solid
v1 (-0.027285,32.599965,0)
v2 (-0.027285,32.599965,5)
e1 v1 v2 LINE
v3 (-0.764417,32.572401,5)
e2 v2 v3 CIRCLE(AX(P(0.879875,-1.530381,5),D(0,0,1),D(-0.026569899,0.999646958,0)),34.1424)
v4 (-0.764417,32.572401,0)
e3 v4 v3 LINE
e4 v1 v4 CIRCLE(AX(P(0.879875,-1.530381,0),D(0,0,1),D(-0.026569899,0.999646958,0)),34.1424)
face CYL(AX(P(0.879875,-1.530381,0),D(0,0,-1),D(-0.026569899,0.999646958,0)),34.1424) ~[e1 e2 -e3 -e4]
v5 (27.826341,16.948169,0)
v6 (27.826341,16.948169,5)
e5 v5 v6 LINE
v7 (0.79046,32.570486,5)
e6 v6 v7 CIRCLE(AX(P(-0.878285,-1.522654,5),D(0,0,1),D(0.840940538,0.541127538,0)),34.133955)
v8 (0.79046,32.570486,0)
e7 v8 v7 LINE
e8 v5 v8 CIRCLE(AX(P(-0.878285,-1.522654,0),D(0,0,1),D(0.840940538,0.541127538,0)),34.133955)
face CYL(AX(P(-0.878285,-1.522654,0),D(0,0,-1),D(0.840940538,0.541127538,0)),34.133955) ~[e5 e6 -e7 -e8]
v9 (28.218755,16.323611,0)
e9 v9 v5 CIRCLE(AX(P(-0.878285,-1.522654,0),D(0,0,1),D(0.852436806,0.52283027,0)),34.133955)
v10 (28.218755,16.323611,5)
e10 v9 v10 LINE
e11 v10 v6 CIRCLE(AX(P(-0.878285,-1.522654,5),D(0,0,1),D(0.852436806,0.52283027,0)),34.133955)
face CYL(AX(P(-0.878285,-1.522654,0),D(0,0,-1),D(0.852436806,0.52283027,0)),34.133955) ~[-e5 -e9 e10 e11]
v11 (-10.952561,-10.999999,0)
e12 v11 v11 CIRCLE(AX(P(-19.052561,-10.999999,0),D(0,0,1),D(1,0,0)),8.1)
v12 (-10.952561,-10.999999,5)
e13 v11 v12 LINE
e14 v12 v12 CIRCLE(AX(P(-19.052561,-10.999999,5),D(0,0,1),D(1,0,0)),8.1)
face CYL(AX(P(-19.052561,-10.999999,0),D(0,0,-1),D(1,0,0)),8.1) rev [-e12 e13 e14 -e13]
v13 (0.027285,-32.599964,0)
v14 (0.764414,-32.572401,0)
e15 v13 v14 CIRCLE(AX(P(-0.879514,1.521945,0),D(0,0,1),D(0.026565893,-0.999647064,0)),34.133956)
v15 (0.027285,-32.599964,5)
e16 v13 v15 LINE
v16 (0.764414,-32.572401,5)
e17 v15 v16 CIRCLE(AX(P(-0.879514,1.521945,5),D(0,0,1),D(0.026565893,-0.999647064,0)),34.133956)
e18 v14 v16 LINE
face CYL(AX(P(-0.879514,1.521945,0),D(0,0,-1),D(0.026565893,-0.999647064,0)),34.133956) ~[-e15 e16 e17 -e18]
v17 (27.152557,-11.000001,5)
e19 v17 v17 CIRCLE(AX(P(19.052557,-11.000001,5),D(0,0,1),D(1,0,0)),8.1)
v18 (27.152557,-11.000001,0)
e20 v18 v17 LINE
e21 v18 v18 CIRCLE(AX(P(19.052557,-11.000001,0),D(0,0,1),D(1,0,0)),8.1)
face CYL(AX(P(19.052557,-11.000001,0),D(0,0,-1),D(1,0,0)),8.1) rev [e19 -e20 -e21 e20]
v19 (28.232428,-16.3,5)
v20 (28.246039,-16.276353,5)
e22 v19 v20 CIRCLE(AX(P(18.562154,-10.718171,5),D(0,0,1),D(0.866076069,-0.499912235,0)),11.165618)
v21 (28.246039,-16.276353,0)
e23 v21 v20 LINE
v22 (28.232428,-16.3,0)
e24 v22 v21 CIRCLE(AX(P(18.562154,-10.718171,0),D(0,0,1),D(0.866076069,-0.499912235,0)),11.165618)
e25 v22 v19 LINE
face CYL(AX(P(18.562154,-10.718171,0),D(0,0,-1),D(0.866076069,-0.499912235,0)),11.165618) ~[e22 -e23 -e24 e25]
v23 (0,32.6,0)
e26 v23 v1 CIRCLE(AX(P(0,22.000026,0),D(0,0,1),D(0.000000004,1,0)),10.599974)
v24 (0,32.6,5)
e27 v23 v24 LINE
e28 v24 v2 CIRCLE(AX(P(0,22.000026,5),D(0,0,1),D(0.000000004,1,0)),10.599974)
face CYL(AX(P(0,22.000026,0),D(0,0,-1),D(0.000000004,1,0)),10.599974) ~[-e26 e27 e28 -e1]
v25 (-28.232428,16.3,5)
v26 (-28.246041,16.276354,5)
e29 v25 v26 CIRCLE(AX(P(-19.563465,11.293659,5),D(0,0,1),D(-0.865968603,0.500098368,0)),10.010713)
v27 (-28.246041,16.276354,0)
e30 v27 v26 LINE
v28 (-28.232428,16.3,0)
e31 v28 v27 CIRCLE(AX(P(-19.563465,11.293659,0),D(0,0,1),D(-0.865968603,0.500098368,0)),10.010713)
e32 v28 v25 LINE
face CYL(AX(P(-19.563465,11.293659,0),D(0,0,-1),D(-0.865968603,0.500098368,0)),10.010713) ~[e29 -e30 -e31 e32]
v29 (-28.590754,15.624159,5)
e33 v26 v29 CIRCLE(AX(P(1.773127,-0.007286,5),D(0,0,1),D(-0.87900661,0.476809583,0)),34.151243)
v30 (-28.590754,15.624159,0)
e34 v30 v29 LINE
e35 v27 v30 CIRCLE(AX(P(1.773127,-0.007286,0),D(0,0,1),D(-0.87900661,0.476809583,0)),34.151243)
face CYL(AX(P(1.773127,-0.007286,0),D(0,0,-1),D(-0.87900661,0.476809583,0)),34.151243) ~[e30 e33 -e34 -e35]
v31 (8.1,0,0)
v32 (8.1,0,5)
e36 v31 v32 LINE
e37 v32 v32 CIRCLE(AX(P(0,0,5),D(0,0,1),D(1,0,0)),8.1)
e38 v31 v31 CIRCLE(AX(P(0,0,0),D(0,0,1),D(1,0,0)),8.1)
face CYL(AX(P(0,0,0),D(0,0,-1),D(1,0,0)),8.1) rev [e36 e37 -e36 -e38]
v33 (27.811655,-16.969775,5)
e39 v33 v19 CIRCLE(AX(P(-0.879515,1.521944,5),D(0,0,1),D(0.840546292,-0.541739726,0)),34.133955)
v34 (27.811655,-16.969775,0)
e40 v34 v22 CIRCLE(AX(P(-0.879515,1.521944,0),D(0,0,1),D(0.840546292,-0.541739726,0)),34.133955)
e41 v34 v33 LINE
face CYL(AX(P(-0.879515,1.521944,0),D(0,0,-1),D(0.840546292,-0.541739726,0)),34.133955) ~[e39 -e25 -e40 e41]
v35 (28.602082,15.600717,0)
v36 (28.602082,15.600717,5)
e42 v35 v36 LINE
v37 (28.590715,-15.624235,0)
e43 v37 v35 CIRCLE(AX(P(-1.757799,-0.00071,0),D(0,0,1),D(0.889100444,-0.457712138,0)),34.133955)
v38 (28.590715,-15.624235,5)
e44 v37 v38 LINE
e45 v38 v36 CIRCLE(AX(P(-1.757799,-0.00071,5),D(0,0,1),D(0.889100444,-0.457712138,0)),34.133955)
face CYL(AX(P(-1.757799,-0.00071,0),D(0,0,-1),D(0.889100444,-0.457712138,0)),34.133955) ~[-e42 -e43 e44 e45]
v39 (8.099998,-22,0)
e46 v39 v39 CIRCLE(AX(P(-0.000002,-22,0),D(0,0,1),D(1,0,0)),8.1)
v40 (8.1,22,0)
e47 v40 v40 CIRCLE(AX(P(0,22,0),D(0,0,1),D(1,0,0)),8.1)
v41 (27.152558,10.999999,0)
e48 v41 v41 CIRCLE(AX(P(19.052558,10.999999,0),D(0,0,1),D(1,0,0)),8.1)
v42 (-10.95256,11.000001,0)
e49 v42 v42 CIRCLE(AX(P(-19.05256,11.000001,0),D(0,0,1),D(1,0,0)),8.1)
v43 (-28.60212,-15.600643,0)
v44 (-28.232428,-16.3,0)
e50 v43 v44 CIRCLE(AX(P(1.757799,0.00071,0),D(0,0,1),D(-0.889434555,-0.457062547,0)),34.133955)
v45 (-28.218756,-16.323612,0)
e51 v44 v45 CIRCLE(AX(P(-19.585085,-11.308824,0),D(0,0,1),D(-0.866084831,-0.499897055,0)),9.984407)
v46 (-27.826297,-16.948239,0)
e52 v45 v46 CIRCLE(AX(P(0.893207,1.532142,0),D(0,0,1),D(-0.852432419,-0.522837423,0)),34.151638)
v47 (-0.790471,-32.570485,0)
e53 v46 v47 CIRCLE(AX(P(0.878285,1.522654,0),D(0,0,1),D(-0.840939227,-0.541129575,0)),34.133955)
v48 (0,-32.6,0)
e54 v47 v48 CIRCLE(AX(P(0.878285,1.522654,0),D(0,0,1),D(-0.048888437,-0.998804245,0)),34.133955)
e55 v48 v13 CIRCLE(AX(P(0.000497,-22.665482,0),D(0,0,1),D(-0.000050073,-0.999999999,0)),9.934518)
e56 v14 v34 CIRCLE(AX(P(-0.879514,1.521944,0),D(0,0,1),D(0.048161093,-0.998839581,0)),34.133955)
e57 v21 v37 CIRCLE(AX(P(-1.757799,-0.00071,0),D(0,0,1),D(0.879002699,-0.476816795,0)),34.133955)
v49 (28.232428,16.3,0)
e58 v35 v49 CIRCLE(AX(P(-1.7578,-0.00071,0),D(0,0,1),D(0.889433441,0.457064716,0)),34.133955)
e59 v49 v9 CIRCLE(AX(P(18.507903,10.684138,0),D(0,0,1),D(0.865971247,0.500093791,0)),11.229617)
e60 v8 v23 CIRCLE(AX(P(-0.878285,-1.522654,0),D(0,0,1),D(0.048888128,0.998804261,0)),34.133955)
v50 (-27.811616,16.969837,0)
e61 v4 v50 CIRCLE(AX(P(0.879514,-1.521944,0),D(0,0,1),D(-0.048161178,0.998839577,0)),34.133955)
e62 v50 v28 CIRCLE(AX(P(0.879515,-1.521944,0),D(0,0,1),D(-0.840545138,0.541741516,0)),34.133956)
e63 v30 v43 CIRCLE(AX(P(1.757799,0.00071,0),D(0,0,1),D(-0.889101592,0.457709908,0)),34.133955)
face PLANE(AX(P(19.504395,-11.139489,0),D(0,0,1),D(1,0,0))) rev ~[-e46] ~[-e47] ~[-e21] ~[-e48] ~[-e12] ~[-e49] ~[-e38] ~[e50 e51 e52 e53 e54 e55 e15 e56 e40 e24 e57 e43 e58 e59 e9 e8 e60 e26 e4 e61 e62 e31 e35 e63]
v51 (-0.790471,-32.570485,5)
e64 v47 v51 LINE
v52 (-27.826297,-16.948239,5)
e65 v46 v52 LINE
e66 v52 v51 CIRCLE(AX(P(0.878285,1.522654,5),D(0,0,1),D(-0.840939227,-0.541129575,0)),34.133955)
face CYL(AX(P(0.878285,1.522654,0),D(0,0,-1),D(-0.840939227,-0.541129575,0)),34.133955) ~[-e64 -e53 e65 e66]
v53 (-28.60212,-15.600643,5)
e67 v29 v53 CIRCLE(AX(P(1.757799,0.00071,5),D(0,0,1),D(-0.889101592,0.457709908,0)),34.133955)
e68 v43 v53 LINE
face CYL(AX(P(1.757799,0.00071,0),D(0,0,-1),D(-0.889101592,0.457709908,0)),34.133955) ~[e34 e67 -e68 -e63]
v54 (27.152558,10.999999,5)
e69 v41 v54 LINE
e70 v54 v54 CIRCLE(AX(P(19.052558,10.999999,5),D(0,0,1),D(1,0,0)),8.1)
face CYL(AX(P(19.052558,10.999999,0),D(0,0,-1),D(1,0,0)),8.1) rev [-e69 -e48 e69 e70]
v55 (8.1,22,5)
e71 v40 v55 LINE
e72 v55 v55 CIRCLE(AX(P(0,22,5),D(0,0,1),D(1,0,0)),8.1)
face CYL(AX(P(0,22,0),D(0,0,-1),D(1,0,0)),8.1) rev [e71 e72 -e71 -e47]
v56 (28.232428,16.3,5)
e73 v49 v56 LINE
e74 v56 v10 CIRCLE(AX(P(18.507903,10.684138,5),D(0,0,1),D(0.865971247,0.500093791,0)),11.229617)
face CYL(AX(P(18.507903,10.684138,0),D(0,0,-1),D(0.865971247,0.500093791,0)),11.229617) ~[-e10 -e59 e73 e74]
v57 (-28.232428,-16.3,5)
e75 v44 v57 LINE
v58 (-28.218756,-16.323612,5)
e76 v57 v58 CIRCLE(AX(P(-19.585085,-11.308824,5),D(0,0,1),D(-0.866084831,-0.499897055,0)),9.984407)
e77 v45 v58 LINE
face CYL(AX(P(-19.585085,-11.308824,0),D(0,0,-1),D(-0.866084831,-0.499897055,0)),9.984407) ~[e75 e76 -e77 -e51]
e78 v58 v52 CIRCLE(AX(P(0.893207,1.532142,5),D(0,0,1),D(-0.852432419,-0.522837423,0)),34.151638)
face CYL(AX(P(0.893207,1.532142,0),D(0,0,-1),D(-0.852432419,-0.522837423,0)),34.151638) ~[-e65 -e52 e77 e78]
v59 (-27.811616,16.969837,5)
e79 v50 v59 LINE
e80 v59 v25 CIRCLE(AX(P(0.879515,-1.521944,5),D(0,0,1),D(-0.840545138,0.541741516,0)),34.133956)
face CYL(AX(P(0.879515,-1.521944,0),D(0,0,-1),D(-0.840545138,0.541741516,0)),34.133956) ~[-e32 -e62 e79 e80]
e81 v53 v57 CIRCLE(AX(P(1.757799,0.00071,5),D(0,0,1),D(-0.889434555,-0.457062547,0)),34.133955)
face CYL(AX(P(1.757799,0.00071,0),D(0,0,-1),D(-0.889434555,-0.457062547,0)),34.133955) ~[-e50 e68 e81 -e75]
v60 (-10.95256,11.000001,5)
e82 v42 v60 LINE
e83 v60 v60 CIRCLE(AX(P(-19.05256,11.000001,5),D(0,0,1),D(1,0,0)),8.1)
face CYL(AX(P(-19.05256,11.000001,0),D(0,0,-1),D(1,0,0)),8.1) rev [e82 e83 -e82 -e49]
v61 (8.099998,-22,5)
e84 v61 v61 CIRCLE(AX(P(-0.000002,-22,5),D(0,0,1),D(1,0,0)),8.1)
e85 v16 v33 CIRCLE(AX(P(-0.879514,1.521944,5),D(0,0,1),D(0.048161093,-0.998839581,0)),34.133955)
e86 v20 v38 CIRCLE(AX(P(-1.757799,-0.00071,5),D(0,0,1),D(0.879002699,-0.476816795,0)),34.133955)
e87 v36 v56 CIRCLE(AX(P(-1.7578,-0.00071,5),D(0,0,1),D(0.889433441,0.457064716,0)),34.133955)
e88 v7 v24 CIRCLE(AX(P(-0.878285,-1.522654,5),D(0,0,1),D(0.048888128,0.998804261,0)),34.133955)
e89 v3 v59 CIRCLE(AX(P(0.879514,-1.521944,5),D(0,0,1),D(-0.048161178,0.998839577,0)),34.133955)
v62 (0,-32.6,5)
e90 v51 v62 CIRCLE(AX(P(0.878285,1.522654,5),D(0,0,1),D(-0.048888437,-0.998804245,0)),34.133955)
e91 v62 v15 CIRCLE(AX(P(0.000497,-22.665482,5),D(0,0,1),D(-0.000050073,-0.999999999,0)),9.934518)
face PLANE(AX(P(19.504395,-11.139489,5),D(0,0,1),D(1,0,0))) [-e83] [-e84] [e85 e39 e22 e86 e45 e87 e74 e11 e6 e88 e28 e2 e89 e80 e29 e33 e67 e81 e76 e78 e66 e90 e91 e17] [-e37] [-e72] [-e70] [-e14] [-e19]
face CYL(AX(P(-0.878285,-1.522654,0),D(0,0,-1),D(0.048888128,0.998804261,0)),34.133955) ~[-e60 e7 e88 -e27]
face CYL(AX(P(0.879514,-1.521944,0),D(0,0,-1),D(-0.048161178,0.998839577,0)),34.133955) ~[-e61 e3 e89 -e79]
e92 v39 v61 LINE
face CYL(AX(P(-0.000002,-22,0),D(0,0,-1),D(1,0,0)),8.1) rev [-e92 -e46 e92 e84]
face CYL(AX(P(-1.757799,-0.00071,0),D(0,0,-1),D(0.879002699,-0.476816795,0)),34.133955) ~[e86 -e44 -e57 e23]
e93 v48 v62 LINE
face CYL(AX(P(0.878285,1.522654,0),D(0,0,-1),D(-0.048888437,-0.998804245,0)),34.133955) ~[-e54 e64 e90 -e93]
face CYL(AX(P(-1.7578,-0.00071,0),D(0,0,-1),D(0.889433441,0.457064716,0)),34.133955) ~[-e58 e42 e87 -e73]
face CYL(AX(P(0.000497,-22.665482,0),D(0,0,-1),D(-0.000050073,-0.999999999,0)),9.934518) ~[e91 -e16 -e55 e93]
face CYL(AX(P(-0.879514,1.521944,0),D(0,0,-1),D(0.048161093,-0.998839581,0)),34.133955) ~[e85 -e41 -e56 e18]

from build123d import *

# Parameters (mm, degrees)
F0_R     = 10.6
F1_DEPTH = 5
F0_R_2   = 8.1
F2_DEPTH = 5


# Not quite as in the source:
# - ends of sketch curves that miss each other by under 0.0002 mm in the source are joined


with BuildPart() as f1:
    # F0 (on Top) → F1 (new body)
    with BuildSketch(Plane.XY):
        with BuildLine():
            ThreePointArc((27.8263414504, 16.9481692723), (16.199467196, 28.0319950031), (0.7904601582, 32.5704859273))
            ThreePointArc((0.7904601582, 32.5704859273), (7.7697772708, 29.2104480555), (10.6, 22))
            ThreePointArc((10.6, 22), (-7.2200130901, 14.2391101684), (-0.7644171658, 32.5724011651))
            ThreePointArc((-0.7644171658, 32.5724011651), (-16.1766867062, 28.0451473253), (-27.8116156006, 16.9698365243))
            ThreePointArc((-27.8116156006, 16.9698365243), (-15.9289393792, 21.1293147465), (-8.4525595083, 11.0000009845))
            ThreePointArc((-8.4525595083, 11.0000009845), (-21.4248089079, 0.6688619967), (-28.5907543736, 15.6241591469))
            ThreePointArc((-28.5907543736, 15.6241591469), (-32.3761533963, 0.0131339969), (-28.6021197402, -15.6006426749))
            ThreePointArc((-28.6021197402, -15.6006426749), (-21.4120811641, -0.665945501), (-8.4525606734, -10.9999990645))
            ThreePointArc((-8.4525606734, -10.9999990645), (-15.9414195658, -21.1331526215), (-27.8262967127, -16.9482387968))
            ThreePointArc((-27.8262967127, -16.9482387968), (-16.1994359735, -28.0320130446), (-0.7904706999, -32.5704854113))
            ThreePointArc((-0.7904706999, -32.5704854113), (-7.2104473679, -14.2302200266), (10.5999976698, -22.0000000981))
            ThreePointArc((10.5999976698, -22.0000000981), (7.7608872989, -29.2200134059), (0.7644142424, -32.5724013061))
            ThreePointArc((0.7644142424, -32.5724013061), (16.17671692, -28.045129896), (27.8116549786, -16.9697754267))
            ThreePointArc((27.8116549786, -16.9697754267), (8.9232325044, -7.8764163379), (29.652557178, -11.0000010826))
            ThreePointArc((29.652557178, -11.0000010826), (29.3836867135, -13.3722916469), (28.5907151929, -15.6242352553))
            ThreePointArc((28.5907151929, -15.6242352553), (32.3761533958, -0.0131351765), (28.6020816932, 15.6007167134))
            ThreePointArc((28.6020816932, 15.6007167134), (29.3866027477, 13.3595595706), (29.6525583432, 10.9999989665))
            ThreePointArc((29.6525583432, 10.9999989665), (8.9193924771, 7.8888979505), (27.8263414504, 16.9481692723))
        make_face()
        Circle(F0_R, mode=Mode.SUBTRACT)
    extrude(amount=F1_DEPTH)

    # F0 (on Top) → F2 (join)
    with BuildSketch(Plane.XY):
        with BuildLine():
            ThreePointArc((28.2460392226, -16.2763527502), (28.4201387166, -15.9512250463), (28.5907151929, -15.6242352553))
            ThreePointArc((28.5907151929, -15.6242352553), (29.3836867135, -13.3722916469), (29.652557178, -11.0000010826))
            ThreePointArc((29.652557178, -11.0000010826), (8.9232325044, -7.8764163379), (27.8116549786, -16.9697754267))
            ThreePointArc((27.8116549786, -16.9697754267), (28.023981709, -16.6361065668), (28.2324281634, -16.3))
            ThreePointArc((28.2324281634, -16.3), (28.2392409163, -16.2881805324), (28.2460392226, -16.2763527502))
        make_face()
        with Locations((19.052557178, -11.0000010826)):
            Circle(F0_R_2, mode=Mode.SUBTRACT)
        with BuildLine():
            ThreePointArc((28.2187545739, 16.3236111479), (28.0242350806, 16.636950204), (27.8263414504, 16.9481692723))
            ThreePointArc((27.8263414504, 16.9481692723), (8.9193924771, 7.8888979505), (29.6525583432, 10.9999989665))
            ThreePointArc((29.6525583432, 10.9999989665), (29.3866027477, 13.3595595706), (28.6020816932, 15.6007167134))
            ThreePointArc((28.6020816932, 15.6007167134), (28.4192805282, 15.9514291247), (28.2324281634, 16.3))
            ThreePointArc((28.2324281634, 16.3), (28.2255985395, 16.3118097271), (28.2187545739, 16.3236111479))
        make_face()
        with Locations((19.0525583432, 10.9999989665)):
            Circle(F0_R_2, mode=Mode.SUBTRACT)
        with BuildLine():
            ThreePointArc((0.0272846487, -32.5999638982), (0.3959239022, -32.5881738584), (0.7644142424, -32.5724013061))
            ThreePointArc((0.7644142424, -32.5724013061), (7.7608872989, -29.2200134059), (10.5999976698, -22.0000000981))
            ThreePointArc((10.5999976698, -22.0000000981), (-7.2104473679, -14.2302200266), (-0.7904706999, -32.5704854113))
            ThreePointArc((-0.7904706999, -32.5704854113), (-0.3953208493, -32.5875325821), (0, -32.6))
            ThreePointArc((0, -32.6), (0.013642337, -32.5999913161), (0.0272846487, -32.5999638982))
        make_face()
        with Locations((-2.3302e-06, -22.0000000981)):
            Circle(F0_R_2, mode=Mode.SUBTRACT)
        Circle(F0_R)
        Circle(F0_R_2, mode=Mode.SUBTRACT)
        with BuildLine():
            ThreePointArc((-8.4525606734, -10.9999990645), (-21.4120811641, -0.665945501), (-28.6021197402, -15.6006426749))
            ThreePointArc((-28.6021197402, -15.6006426749), (-28.4192999794, -15.9513923284), (-28.2324281634, -16.3))
            ThreePointArc((-28.2324281634, -16.3), (-28.2256003271, -16.3118107622), (-28.218756359, -16.3236121847))
            ThreePointArc((-28.218756359, -16.3236121847), (-28.0242130887, -16.6369852059), (-27.8262967127, -16.9482387968))
            ThreePointArc((-27.8262967127, -16.9482387968), (-15.9414195658, -21.1331526215), (-8.4525606734, -10.9999990645))
        make_face()
        with Locations((-19.0525606734, -10.9999990645)):
            Circle(F0_R_2, mode=Mode.SUBTRACT)
        with BuildLine():
            ThreePointArc((-8.4525595083, 11.0000009845), (-15.9289393792, 21.1293147465), (-27.8116156006, 16.9698365243))
            ThreePointArc((-27.8116156006, 16.9698365243), (-28.0239623753, 16.6361373416), (-28.2324281634, 16.3))
            ThreePointArc((-28.2324281634, 16.3), (-28.2392426242, 16.2881815155), (-28.2460409731, 16.2763537548))
            ThreePointArc((-28.2460409731, 16.2763537548), (-28.420158717, 15.951187206), (-28.5907543736, 15.6241591469))
            ThreePointArc((-28.5907543736, 15.6241591469), (-21.4248089079, 0.6688619967), (-8.4525595083, 11.0000009845))
        make_face()
        with Locations((-19.0525595083, 11.0000009845)):
            Circle(F0_R_2, mode=Mode.SUBTRACT)
        with BuildLine():
            ThreePointArc((0.7904601582, 32.5704859273), (0.3953155758, 32.587532779), (0, 32.6))
            ThreePointArc((0, 32.6), (-0.0136423369, 32.5999912211), (-0.0272846512, 32.5999648843))
            ThreePointArc((-0.0272846512, 32.5999648843), (-0.3959253645, 32.5881738038), (-0.7644171658, 32.5724011651))
            ThreePointArc((-0.7644171658, 32.5724011651), (-7.2200130901, 14.2391101684), (10.6, 22))
            ThreePointArc((10.6, 22), (7.7697772708, 29.2104480555), (0.7904601582, 32.5704859273))
        make_face()
        with Locations((0, 22)):
            Circle(F0_R_2, mode=Mode.SUBTRACT)
    extrude(amount=F2_DEPTH)


solid = f1.part
